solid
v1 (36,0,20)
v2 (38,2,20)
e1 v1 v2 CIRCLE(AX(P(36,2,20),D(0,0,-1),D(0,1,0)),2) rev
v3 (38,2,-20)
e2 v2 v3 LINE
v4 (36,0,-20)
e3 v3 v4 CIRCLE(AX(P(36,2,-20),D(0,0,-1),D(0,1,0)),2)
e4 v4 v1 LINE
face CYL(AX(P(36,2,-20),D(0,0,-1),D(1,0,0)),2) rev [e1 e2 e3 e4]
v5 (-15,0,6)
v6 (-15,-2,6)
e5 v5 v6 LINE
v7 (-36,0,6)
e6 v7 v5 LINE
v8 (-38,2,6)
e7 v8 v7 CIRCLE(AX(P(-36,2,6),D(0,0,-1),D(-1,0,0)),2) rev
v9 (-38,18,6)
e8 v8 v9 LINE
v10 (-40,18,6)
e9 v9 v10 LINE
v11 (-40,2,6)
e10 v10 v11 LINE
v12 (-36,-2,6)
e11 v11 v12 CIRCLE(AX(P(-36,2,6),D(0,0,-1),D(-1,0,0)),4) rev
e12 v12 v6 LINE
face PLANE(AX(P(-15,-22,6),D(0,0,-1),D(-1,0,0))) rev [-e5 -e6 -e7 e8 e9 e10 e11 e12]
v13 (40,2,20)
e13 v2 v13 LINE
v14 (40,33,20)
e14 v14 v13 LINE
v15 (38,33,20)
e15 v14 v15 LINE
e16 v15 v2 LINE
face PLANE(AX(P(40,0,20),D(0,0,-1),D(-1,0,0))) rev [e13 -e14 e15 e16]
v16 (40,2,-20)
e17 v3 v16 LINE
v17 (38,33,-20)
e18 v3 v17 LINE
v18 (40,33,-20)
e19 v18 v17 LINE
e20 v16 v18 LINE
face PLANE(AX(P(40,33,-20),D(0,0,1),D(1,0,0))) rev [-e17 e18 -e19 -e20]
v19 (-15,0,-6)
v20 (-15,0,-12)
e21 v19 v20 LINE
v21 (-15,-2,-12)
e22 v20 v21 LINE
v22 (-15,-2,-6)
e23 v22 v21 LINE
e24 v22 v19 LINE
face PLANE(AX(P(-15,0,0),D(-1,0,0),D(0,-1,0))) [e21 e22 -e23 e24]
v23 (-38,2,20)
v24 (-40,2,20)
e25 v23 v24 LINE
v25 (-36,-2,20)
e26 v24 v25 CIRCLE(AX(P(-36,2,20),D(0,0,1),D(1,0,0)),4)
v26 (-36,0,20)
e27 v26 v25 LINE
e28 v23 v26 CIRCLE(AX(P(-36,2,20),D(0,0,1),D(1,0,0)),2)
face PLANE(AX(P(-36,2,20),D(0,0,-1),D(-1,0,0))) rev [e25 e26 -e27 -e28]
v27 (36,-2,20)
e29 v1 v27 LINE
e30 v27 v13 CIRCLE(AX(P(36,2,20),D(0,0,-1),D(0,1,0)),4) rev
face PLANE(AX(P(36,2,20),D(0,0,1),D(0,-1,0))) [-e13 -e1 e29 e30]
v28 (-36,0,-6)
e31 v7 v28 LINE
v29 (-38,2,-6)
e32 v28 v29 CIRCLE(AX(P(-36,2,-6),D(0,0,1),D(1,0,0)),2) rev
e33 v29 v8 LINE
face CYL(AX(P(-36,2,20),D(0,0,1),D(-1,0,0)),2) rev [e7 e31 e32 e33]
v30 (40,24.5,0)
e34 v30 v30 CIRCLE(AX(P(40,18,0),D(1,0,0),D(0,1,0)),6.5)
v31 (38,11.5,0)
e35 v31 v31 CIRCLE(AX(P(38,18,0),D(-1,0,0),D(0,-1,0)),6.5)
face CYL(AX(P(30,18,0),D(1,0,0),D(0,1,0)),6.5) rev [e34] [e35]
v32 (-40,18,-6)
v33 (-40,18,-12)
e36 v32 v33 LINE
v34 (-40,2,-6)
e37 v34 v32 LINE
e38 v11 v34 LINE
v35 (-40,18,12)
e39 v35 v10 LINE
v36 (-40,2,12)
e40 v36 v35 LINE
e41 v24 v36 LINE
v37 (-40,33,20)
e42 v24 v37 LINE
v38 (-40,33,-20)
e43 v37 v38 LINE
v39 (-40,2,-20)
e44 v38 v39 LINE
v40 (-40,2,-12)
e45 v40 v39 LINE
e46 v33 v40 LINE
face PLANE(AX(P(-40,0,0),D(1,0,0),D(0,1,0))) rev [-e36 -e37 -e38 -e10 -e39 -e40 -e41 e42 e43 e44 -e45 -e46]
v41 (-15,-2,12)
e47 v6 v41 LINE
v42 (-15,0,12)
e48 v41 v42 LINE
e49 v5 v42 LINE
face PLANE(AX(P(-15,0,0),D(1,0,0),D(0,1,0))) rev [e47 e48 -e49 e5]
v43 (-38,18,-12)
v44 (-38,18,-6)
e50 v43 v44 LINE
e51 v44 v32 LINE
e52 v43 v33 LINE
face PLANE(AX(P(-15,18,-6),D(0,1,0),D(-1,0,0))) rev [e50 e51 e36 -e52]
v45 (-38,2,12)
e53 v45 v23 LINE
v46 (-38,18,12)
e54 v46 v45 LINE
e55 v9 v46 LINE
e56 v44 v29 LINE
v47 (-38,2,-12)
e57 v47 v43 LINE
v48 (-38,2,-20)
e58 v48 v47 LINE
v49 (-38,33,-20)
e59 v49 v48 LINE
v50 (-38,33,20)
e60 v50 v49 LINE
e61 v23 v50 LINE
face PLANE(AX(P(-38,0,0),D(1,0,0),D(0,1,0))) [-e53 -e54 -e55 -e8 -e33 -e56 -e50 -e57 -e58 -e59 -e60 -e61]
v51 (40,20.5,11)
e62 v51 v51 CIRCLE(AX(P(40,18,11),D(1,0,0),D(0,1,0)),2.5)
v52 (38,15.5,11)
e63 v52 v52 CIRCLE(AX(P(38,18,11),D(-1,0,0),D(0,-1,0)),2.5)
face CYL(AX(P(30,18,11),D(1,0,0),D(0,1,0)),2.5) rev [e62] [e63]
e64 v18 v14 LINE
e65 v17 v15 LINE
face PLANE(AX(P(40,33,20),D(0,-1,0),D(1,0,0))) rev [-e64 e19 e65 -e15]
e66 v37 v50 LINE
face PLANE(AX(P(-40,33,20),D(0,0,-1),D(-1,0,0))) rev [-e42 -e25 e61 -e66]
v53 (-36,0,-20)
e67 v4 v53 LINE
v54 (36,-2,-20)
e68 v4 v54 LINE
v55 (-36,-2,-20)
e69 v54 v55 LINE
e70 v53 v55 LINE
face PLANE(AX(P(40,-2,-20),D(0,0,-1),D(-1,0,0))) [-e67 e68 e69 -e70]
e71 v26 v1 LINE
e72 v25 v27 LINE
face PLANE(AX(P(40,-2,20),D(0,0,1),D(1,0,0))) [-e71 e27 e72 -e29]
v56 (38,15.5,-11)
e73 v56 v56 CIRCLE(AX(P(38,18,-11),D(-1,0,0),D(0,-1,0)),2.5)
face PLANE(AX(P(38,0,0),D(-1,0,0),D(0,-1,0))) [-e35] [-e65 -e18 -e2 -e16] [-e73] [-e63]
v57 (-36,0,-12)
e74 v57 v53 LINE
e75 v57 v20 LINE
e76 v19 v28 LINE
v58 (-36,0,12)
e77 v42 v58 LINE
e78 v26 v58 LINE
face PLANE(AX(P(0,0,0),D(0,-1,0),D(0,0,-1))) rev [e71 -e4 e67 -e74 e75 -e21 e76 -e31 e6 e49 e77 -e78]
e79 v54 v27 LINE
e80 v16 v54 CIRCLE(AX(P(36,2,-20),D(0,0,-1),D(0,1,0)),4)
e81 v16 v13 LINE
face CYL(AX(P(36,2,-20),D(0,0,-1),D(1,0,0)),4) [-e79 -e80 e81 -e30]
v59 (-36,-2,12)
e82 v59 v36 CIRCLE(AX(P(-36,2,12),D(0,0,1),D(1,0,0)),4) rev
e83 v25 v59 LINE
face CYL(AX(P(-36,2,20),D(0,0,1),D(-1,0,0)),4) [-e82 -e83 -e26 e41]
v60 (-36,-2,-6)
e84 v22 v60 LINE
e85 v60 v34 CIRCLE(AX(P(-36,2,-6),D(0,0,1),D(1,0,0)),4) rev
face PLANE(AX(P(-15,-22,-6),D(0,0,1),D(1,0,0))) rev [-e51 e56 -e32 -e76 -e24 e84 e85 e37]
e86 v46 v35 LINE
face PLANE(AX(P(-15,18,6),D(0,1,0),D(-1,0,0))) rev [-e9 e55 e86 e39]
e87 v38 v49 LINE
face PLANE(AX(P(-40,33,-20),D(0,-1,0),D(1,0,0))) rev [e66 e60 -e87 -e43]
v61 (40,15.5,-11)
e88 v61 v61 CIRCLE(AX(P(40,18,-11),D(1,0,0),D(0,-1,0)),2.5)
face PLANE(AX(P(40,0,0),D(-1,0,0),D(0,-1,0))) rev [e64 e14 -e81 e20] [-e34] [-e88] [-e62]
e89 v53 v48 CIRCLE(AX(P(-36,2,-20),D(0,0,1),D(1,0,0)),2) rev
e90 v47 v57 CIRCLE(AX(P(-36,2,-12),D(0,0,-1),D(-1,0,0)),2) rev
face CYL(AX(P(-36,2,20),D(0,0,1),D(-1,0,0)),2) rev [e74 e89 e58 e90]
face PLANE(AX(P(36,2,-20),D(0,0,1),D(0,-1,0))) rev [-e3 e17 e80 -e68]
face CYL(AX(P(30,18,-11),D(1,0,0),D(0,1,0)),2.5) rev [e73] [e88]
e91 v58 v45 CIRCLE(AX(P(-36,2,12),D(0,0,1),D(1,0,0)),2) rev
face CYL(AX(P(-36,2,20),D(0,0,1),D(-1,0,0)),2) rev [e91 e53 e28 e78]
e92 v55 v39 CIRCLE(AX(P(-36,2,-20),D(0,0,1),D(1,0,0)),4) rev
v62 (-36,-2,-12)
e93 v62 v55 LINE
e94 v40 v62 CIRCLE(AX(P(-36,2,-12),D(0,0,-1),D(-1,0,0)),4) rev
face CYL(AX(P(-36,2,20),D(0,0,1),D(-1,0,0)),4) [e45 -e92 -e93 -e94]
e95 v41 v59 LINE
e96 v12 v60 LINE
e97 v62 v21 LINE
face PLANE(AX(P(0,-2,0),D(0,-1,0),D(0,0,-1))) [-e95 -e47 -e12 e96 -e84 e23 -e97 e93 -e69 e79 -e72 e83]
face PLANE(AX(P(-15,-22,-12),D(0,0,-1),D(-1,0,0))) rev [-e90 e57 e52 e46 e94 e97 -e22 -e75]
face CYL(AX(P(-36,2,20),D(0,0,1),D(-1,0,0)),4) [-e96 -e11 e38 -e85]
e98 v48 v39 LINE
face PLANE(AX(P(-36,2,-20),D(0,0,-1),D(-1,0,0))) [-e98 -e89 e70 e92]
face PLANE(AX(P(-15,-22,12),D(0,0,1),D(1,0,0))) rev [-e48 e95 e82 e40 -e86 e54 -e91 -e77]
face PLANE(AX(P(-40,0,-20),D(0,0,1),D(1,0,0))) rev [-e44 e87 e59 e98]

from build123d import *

# Parameters (mm, degrees)
SKETCH1_W                      = 80
SKETCH1_H                      = 40
BASE_FLANGE1_DEPTH             = 2
EDGE_FLANGE1_STRIP_W           = 12
EDGE_FLANGE1_STRIP_H           = 2
EDGE_FLANGE1_STRIP_CUT_DEPTH   = 40
EDGE_FLANGE1_STRIP_2_W         = 12
EDGE_FLANGE1_STRIP_2_H         = 2
EDGE_FLANGE1_STRIP_CUT_2_DEPTH = 40
EDGE_FLANGE1_DEPTH             = 40
EDGE_FLANGE1_BEND_DEPTH        = 40
SKETCH12_R                     = 6.5
SKETCH12_R_2                   = 2.5
CUT_EXTRUDE1_DEPTH             = 10
SKETCH13_W                     = 6
SKETCH13_H                     = 40
CUT_EXTRUDE2_DEPTH             = 25


# Sheet-metal steps are written as plain solids
with BuildPart() as part:
    # Sketch1 → Base-Flange1 (new body)
    with BuildSketch(Plane(origin=(0, 0, 0), x_dir=(1, 0, 0), z_dir=(0, 1, 0))):
        Rectangle(SKETCH1_W, SKETCH1_H)
    extrude(amount=-BASE_FLANGE1_DEPTH)

    # Edge-Flange1 strip (across the edge) → Edge-Flange1 strip cut (cut)
    with BuildSketch(Plane(origin=(-40, 0, -20), x_dir=(1, 0, 0), z_dir=(0, 0, 1))):
        with Locations((-2, -1)):
            Rectangle(EDGE_FLANGE1_STRIP_W, EDGE_FLANGE1_STRIP_H)
    extrude(amount=EDGE_FLANGE1_STRIP_CUT_DEPTH, mode=Mode.SUBTRACT)

    # Edge-Flange1 strip 2 (across the edge) → Edge-Flange1 strip cut 2 (cut)
    with BuildSketch(Plane(origin=(40, 0, 20), x_dir=(-1, 0, 0), z_dir=(0, 0, -1))):
        with Locations((-2, -1)):
            Rectangle(EDGE_FLANGE1_STRIP_2_W, EDGE_FLANGE1_STRIP_2_H)
    extrude(amount=EDGE_FLANGE1_STRIP_CUT_2_DEPTH, mode=Mode.SUBTRACT)

    # Edge-Flange1 section (across the edge) → Edge-Flange1 (add)
    with BuildSketch(Plane(origin=(-40, 0, -20), x_dir=(1, 0, 0), z_dir=(0, 0, 1))):
        with BuildLine():
            Line((0, 2), (0, 33))
            Line((0, 33), (2, 33))
            Line((2, 33), (2, 2))
            ThreePointArc((2, 2), (2.585786438, 0.585786438), (4, 0))
            Line((4, 0), (4, -2))
            ThreePointArc((4, -2), (1.171572875, -0.828427125), (0, 2))
        make_face()
    extrude(amount=EDGE_FLANGE1_DEPTH)

    # Edge-Flange1 section 2 (across the edge) → Edge-Flange1 bend (add)
    with BuildSketch(Plane(origin=(40, 0, 20), x_dir=(-1, 0, 0), z_dir=(0, 0, -1))):
        with BuildLine():
            Line((0, 2), (0, 33))
            Line((0, 33), (2, 33))
            Line((2, 33), (2, 2))
            ThreePointArc((2, 2), (2.585786438, 0.585786438), (4, 0))
            Line((4, 0), (4, -2))
            ThreePointArc((4, -2), (1.171572875, -0.828427125), (0, 2))
        make_face()
    extrude(amount=EDGE_FLANGE1_BEND_DEPTH)

    # Sketch12 → Cut-Extrude1 (cut)
    with BuildSketch(Plane(origin=(40, 0, 0), x_dir=(0, 0, -1), z_dir=(1, 0, 0))):
        with Locations(Location((0, 18, 0), (0, 0, 90))):
            Circle(SKETCH12_R)
        with Locations(Location((-11, 18, 0), (0, 0, 90))):
            Circle(SKETCH12_R_2)
        with Locations(Location((11, 18, 0), (0, 0, 270))):
            Circle(SKETCH12_R_2)
    extrude(amount=-CUT_EXTRUDE1_DEPTH, mode=Mode.SUBTRACT)

    # Sketch13 → Cut-Extrude2 (cut)
    with BuildSketch(Plane.ZY.offset(40)):
        with Locations((9, -2)):
            Rectangle(SKETCH13_W, SKETCH13_H)
        with Locations((-9, -2)):
            Rectangle(SKETCH13_W, SKETCH13_H)
    extrude(amount=-CUT_EXTRUDE2_DEPTH, mode=Mode.SUBTRACT)


solid = part.part
